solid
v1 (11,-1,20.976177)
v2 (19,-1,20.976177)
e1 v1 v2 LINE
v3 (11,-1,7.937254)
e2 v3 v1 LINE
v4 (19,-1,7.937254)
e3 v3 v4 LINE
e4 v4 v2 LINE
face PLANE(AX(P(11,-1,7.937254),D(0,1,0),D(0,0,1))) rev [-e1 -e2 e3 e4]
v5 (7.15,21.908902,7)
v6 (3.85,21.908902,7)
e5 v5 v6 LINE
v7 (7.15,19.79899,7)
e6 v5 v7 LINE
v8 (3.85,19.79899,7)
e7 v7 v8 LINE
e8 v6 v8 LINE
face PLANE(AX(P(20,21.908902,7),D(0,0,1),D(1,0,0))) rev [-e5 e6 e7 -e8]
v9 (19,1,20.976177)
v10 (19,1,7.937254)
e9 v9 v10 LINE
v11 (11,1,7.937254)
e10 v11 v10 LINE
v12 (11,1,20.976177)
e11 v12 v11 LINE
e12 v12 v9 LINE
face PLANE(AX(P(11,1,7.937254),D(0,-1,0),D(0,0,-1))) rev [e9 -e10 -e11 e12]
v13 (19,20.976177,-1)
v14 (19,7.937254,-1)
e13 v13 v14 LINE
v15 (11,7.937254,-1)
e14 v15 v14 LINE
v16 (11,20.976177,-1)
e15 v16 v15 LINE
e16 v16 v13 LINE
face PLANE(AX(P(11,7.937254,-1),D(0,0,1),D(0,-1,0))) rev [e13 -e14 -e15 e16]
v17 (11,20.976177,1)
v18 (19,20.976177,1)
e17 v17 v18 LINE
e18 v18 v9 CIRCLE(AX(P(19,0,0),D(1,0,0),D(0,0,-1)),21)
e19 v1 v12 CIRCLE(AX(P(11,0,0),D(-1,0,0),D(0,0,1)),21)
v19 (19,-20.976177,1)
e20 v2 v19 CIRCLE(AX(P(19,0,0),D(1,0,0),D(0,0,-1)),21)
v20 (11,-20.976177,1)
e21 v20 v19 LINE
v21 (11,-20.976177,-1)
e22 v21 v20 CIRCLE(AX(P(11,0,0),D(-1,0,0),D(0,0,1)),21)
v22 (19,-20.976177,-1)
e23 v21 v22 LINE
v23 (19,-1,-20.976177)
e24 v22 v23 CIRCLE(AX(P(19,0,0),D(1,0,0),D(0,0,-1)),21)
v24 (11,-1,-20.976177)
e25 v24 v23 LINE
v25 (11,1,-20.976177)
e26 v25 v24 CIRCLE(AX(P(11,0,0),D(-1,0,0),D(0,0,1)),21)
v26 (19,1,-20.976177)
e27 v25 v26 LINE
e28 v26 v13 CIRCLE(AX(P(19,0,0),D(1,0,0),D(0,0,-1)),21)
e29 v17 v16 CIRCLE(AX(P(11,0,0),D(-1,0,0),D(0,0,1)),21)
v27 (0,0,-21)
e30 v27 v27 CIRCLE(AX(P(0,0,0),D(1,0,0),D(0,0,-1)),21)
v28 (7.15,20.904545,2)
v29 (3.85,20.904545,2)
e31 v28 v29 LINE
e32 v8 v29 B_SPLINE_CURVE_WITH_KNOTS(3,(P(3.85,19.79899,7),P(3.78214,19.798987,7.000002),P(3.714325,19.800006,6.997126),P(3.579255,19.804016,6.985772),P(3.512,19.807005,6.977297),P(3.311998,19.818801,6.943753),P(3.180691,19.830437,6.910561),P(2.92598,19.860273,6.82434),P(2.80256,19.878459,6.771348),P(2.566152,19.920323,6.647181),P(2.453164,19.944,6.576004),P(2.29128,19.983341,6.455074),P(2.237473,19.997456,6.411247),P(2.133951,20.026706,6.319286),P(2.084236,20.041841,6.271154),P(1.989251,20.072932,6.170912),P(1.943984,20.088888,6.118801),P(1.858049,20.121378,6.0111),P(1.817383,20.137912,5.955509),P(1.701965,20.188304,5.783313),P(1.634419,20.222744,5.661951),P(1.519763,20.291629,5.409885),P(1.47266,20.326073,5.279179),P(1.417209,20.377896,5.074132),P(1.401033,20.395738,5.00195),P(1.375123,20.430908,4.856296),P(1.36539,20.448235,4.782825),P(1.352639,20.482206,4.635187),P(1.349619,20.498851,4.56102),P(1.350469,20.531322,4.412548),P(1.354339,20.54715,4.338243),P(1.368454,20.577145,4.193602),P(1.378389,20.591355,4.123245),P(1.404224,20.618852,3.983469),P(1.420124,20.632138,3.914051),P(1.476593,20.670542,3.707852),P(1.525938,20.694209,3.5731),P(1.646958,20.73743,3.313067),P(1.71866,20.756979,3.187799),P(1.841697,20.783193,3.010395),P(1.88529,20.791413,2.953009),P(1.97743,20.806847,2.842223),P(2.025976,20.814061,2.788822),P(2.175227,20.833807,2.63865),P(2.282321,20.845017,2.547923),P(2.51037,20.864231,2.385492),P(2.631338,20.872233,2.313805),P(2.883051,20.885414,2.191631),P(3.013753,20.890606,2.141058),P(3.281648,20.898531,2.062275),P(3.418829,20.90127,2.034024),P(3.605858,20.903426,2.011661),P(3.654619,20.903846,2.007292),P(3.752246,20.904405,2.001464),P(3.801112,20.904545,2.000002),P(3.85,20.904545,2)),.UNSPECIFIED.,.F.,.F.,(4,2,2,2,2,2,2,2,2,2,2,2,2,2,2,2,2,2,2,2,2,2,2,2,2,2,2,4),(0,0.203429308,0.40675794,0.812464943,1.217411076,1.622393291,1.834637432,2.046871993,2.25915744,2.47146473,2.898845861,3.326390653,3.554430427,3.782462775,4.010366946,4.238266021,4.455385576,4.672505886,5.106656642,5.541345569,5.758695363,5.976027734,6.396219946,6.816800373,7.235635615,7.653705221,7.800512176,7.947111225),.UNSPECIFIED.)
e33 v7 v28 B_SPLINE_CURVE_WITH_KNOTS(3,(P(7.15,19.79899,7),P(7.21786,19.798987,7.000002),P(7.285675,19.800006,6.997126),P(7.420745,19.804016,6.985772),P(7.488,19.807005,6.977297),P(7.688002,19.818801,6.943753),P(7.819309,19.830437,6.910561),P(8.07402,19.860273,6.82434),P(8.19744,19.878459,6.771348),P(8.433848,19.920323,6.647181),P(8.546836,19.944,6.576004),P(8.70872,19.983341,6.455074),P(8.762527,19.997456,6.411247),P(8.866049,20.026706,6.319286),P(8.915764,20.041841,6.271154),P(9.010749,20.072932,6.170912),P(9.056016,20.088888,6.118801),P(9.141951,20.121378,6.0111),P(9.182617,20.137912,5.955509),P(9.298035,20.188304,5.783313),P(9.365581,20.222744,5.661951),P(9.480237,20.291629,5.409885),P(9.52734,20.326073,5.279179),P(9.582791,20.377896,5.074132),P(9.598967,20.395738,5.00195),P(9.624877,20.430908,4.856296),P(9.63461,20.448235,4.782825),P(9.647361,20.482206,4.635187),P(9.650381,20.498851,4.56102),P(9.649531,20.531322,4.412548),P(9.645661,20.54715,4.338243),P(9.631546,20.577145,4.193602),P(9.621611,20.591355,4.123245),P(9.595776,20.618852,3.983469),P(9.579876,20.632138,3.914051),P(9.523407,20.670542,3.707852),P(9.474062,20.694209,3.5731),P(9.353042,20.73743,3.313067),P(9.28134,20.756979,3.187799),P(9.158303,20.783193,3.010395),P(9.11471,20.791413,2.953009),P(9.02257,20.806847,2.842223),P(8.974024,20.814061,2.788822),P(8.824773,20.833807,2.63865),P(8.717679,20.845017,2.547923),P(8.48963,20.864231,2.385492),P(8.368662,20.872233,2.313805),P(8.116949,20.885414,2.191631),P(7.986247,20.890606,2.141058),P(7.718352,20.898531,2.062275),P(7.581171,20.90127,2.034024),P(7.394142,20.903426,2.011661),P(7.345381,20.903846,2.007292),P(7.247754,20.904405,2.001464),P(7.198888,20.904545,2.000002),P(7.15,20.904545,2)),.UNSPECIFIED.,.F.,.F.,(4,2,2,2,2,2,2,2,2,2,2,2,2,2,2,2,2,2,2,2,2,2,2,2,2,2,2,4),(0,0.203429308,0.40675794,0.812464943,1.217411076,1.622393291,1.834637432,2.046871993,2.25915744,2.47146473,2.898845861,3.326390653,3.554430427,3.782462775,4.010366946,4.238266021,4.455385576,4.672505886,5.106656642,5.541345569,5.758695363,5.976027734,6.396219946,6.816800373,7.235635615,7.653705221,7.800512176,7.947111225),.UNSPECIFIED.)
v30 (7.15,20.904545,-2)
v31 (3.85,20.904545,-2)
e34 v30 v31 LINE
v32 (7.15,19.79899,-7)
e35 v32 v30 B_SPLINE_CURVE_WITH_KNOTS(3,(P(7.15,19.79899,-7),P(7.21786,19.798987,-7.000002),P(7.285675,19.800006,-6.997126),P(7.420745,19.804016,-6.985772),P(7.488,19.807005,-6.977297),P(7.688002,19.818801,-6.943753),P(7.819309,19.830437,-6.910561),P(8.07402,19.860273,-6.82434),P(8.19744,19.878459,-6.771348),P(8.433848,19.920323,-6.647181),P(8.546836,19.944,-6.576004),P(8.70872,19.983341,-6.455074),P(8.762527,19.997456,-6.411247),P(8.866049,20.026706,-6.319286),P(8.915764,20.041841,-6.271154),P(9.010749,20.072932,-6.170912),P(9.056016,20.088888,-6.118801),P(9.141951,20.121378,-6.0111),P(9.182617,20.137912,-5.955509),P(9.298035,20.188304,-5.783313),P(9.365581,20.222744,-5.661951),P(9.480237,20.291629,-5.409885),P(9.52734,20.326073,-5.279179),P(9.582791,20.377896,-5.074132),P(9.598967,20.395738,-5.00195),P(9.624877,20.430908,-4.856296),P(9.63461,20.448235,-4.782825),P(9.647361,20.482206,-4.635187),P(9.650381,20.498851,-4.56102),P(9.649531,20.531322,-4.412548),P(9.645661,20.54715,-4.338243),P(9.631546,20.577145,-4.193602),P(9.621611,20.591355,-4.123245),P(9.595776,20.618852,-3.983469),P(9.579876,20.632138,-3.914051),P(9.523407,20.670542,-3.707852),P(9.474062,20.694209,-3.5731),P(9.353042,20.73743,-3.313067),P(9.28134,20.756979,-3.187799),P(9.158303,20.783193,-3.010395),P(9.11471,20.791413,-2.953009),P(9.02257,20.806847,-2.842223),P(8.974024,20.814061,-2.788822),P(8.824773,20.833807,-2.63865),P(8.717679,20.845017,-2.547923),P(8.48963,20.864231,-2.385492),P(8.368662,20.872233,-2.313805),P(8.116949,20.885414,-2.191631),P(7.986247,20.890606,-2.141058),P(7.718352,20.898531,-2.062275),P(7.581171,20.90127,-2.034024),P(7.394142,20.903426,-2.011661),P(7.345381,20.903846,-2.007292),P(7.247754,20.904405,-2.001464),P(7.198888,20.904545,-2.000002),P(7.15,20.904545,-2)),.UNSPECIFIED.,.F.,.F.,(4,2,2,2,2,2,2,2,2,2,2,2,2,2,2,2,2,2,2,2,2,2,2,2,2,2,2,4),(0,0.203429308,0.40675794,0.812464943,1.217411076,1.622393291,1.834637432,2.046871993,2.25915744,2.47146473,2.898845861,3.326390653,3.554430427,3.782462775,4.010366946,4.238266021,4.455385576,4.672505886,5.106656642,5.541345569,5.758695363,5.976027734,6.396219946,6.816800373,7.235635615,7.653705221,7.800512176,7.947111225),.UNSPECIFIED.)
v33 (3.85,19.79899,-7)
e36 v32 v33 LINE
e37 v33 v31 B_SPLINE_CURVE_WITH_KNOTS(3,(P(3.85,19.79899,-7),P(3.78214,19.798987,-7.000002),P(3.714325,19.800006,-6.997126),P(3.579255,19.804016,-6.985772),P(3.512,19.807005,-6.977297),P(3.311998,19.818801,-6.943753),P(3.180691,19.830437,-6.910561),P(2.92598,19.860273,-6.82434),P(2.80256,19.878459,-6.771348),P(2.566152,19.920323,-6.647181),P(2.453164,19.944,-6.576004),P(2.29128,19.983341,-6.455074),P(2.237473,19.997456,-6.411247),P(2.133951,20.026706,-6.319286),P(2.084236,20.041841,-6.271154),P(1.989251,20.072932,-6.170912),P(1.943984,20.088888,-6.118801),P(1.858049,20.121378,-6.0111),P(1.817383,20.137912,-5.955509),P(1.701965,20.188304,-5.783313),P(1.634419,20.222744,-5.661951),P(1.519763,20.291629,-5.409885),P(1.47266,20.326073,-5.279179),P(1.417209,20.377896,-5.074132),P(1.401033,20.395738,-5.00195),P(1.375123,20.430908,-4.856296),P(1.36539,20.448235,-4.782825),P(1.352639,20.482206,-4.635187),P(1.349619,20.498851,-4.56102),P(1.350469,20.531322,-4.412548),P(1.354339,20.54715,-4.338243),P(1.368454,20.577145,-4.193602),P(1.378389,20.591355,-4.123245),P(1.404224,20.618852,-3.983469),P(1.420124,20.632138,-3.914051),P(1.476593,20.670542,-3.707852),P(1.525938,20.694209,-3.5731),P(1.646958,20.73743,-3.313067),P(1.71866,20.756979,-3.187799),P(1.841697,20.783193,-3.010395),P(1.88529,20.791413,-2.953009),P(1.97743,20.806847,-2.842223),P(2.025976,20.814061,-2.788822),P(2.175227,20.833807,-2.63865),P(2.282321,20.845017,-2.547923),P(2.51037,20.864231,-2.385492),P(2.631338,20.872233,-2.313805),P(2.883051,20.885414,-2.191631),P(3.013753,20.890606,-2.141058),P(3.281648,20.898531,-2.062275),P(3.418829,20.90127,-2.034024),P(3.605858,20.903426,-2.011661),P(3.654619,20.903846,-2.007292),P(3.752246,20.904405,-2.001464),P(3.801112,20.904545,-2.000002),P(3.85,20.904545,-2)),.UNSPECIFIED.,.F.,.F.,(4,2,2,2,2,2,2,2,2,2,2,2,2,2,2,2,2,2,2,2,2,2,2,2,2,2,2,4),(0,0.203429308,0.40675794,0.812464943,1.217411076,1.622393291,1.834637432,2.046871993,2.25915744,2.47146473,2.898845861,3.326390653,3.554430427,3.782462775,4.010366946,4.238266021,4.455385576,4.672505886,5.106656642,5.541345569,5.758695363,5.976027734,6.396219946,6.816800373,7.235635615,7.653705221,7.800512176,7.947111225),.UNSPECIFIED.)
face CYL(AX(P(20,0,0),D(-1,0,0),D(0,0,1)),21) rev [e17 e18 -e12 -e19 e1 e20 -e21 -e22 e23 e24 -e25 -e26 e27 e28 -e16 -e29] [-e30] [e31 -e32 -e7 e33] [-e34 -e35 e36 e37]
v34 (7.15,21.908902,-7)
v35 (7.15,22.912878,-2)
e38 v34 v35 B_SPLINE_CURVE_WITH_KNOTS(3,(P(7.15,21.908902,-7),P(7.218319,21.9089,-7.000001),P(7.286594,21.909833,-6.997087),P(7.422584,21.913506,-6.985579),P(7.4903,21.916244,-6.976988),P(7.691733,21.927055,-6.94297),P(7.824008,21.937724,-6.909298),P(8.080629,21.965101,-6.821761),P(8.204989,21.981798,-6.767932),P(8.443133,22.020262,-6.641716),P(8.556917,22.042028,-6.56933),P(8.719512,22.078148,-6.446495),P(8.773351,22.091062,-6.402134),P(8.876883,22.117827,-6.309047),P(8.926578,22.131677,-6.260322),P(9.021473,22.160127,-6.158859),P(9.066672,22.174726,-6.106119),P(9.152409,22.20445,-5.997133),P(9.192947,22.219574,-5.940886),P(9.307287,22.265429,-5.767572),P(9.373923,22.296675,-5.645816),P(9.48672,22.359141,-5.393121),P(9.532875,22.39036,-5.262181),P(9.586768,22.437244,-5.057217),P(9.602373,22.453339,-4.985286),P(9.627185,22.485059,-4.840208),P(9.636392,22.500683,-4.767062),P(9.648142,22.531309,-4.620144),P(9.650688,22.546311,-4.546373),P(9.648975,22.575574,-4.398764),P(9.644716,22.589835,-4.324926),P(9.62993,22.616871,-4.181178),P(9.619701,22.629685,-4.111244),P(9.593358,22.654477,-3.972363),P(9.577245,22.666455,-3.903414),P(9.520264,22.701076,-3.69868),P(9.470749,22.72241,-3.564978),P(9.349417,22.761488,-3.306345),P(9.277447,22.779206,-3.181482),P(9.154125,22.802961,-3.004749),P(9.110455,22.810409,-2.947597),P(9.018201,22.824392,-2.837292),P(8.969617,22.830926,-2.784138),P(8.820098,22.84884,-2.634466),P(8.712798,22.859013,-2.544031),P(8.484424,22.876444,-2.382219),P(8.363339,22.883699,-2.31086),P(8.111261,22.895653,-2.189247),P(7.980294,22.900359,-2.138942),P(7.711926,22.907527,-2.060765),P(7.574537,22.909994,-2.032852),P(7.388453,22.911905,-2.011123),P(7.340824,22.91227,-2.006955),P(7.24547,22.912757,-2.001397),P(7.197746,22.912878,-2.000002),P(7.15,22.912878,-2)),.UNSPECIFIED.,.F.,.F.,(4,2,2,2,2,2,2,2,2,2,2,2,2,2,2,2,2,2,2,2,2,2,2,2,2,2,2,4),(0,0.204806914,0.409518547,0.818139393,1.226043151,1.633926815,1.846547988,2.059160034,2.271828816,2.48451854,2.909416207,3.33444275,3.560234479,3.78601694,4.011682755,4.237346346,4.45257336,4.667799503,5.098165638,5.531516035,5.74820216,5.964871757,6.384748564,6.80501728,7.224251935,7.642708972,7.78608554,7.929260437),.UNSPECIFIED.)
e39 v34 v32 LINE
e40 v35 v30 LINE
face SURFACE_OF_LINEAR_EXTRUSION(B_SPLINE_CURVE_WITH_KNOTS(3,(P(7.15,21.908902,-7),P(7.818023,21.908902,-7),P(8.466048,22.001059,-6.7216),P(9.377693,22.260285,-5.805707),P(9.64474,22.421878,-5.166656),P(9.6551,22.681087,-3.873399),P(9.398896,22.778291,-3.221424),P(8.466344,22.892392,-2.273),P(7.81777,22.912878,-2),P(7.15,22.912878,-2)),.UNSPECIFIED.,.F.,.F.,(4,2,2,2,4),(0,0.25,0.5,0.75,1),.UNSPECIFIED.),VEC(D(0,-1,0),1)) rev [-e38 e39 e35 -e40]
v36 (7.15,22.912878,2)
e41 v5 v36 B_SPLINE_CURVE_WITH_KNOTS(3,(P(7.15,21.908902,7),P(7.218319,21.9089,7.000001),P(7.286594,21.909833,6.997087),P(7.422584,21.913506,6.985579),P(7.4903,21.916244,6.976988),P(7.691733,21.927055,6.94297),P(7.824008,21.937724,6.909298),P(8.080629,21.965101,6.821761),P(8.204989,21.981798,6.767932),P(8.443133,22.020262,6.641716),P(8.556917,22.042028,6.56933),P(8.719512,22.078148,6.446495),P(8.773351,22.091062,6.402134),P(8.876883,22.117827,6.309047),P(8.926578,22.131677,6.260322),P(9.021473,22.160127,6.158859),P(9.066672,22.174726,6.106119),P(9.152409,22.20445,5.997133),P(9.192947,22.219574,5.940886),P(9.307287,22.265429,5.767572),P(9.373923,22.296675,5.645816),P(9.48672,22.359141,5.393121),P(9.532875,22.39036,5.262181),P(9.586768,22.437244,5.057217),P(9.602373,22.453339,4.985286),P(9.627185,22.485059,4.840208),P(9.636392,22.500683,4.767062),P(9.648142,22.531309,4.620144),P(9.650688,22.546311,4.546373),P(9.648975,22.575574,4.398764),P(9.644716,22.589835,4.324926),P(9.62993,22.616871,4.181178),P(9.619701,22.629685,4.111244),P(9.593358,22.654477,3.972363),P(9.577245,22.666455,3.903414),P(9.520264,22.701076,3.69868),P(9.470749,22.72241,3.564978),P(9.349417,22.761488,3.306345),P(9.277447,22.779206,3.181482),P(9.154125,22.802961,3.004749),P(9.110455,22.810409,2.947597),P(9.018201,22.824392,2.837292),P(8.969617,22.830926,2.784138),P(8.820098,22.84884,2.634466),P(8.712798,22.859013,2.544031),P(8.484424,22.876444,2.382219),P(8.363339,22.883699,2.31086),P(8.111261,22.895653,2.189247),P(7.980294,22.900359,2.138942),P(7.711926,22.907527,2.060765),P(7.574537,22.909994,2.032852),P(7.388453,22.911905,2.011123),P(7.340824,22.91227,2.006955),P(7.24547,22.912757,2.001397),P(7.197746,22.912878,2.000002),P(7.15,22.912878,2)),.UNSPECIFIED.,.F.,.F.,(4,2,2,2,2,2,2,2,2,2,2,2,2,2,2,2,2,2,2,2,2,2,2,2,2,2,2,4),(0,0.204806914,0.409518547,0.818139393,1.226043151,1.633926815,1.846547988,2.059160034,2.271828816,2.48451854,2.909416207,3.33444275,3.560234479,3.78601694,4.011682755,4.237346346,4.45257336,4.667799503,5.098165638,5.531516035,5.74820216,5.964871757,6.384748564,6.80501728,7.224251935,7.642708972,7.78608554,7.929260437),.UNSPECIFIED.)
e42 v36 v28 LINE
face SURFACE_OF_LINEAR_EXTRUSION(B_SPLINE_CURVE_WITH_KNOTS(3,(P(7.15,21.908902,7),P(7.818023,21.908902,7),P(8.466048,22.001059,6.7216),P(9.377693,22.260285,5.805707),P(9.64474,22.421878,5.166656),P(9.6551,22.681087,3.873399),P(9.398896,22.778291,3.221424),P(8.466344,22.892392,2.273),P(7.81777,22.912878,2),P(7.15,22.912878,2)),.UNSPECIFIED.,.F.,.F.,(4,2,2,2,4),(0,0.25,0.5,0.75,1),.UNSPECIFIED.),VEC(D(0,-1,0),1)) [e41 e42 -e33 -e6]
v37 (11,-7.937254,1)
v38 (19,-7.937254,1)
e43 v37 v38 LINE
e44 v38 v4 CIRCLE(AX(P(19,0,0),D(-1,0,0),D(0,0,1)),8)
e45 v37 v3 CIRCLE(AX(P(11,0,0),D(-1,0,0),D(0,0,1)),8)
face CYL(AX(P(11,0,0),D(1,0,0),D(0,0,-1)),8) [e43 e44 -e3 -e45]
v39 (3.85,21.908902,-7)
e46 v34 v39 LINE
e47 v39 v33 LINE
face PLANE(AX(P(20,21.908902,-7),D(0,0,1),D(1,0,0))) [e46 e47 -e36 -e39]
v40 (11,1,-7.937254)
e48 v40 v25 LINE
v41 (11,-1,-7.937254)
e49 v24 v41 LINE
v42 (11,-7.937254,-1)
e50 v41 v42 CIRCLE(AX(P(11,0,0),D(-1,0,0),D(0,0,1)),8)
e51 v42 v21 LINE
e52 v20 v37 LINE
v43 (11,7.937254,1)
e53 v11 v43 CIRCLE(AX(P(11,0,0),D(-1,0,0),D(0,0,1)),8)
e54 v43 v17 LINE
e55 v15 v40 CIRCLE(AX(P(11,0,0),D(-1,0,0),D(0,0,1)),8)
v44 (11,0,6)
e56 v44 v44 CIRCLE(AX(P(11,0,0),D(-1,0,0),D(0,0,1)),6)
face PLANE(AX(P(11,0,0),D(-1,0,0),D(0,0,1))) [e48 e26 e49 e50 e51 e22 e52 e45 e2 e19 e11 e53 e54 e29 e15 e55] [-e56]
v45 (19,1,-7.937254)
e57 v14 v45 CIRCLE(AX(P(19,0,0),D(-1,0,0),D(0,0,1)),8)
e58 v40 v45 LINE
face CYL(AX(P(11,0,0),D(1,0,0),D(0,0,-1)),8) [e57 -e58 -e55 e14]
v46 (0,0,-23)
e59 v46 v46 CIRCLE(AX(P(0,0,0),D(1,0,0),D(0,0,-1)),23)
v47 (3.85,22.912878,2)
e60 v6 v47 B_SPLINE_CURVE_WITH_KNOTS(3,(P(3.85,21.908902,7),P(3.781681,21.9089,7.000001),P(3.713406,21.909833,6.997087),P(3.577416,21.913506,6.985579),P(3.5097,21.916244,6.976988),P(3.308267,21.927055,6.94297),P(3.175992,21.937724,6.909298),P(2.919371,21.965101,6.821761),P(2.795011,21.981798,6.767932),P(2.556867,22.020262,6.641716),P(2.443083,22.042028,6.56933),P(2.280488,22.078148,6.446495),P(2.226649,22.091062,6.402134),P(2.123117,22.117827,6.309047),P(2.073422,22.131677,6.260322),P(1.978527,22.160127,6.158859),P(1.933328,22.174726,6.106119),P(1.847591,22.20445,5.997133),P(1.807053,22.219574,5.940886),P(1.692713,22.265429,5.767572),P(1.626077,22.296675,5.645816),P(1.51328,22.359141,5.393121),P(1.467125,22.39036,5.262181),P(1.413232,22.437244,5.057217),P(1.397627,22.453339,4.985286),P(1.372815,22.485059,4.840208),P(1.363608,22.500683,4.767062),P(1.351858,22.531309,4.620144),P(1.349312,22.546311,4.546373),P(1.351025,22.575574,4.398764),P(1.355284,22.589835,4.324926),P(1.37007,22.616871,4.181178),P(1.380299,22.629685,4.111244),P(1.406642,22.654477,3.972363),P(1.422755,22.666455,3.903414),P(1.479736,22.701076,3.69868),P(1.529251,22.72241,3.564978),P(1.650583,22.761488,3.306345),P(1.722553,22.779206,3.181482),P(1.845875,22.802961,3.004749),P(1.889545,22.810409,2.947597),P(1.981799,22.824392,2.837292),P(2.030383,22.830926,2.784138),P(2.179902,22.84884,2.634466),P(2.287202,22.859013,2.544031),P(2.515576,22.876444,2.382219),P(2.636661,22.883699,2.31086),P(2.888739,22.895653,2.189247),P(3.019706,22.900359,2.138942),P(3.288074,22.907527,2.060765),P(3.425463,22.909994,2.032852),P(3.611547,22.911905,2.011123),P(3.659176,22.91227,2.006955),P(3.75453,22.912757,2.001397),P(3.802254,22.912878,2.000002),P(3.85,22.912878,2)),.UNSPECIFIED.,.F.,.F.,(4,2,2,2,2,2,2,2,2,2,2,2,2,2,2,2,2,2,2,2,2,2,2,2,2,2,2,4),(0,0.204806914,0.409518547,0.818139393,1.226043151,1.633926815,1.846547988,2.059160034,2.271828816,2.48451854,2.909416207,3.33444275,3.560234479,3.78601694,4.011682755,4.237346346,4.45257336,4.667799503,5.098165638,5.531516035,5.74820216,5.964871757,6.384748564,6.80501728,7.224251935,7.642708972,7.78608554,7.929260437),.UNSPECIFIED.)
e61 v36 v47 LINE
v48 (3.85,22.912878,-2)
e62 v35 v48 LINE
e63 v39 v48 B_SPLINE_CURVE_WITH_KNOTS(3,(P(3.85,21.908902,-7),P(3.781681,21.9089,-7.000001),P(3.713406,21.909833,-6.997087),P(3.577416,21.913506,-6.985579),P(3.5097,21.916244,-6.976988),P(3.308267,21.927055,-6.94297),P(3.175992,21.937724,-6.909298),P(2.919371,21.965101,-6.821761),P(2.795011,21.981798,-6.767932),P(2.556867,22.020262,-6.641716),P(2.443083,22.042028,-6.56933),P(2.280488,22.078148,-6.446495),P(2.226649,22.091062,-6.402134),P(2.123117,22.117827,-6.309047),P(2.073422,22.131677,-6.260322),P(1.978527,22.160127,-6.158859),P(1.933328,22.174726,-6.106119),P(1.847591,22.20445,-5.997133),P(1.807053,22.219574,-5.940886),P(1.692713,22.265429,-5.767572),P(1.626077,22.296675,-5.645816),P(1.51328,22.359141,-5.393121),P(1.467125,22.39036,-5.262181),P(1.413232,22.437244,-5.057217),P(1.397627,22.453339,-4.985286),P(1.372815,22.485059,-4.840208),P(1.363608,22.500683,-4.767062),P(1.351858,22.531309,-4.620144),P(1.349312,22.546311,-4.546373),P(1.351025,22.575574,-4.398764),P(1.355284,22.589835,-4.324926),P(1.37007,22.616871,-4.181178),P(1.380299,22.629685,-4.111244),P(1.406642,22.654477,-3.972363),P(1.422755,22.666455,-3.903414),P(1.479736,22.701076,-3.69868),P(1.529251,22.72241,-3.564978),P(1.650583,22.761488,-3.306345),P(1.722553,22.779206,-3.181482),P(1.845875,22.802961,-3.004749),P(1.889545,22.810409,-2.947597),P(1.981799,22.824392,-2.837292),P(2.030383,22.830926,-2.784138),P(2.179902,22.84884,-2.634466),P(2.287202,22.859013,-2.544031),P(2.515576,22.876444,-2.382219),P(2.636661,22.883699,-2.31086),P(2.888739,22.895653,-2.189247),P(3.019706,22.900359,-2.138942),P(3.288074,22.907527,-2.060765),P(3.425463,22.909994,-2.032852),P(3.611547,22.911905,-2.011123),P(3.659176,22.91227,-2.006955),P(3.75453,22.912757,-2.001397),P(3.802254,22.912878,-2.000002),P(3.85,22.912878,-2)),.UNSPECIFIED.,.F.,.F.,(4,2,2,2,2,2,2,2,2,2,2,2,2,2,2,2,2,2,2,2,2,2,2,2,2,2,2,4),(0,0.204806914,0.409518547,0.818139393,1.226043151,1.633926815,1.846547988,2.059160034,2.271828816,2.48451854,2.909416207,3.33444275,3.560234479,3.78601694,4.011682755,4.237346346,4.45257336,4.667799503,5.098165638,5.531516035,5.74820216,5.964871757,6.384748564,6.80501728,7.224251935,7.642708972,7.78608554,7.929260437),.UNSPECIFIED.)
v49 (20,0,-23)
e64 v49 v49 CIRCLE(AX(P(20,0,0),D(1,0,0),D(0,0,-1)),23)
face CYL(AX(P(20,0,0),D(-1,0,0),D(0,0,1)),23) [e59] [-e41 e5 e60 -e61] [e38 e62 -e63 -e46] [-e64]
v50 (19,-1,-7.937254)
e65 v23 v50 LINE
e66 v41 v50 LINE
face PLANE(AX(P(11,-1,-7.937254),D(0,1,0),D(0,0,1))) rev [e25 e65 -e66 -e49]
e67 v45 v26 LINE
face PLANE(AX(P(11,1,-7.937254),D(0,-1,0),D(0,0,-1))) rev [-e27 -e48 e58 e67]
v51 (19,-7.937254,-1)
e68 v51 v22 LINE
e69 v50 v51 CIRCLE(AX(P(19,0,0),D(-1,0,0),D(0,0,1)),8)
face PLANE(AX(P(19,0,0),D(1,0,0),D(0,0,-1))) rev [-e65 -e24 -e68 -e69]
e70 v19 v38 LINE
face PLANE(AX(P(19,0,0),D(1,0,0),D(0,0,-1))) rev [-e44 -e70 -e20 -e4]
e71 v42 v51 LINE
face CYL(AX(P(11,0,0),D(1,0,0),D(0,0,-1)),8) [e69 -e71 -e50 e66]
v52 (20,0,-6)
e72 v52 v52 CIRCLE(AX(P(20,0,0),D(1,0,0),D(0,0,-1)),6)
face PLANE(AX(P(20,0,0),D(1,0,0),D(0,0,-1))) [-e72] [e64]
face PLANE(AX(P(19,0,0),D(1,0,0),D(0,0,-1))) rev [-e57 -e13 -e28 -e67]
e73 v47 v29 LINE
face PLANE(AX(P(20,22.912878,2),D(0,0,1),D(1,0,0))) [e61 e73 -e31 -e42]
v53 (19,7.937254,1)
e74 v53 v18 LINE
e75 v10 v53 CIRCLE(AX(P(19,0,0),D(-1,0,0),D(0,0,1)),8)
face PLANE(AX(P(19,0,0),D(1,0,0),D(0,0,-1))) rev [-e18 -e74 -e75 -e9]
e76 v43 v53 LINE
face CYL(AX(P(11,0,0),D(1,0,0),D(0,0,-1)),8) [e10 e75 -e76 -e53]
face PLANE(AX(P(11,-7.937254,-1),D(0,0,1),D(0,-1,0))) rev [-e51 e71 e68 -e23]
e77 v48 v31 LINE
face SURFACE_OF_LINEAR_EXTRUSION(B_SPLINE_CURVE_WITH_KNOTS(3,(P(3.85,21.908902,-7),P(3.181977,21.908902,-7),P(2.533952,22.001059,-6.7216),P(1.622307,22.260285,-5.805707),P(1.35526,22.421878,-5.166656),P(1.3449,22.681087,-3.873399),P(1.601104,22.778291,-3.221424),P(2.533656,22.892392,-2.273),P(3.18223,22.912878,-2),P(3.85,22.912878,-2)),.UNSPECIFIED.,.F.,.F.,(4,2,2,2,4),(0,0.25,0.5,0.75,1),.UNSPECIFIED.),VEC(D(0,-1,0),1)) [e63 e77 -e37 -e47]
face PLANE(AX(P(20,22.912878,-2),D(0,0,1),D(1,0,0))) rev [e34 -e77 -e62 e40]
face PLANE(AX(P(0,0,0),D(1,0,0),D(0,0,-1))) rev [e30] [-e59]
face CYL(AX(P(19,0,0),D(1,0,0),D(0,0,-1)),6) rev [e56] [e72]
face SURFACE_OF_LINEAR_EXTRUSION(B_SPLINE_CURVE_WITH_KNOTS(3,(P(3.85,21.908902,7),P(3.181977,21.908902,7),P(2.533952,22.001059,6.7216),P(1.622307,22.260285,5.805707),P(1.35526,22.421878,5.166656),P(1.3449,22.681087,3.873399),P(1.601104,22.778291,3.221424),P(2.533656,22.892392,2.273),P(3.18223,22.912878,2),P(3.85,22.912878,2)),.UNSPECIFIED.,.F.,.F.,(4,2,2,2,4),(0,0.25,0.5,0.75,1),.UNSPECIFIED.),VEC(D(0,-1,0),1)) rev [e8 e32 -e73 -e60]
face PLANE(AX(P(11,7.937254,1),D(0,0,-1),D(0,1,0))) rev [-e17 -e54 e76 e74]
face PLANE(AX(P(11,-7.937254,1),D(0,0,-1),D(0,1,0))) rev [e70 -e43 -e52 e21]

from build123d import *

# Parameters (mm, degrees)
SKETCH1_R           = 23
SKETCH1_R_2         = 21
BOSS_EXTRUDE1_DEPTH = 20
CUT_EXTRUDE1_START  = 19.798989767
CUT_EXTRUDE1_DEPTH  = 3.113888708
BOSS_EXTRUDE2_START = -1
SKETCH3_R           = 21
SKETCH3_R_2         = 6
BOSS_EXTRUDE2_DEPTH = 1
BOSS_EXTRUDE3_START = 8
SKETCH4_R           = 6
BOSS_EXTRUDE3_DEPTH = 8


# Read off the part's stored shape, not the designer's step: Cut-Extrude1
with BuildPart() as part:
    # Sketch1 → Boss-Extrude1 (new body)
    with BuildSketch(Plane(origin=(0, 0, 0), x_dir=(0, 0, -1), z_dir=(1, 0, 0))):
        Circle(SKETCH1_R)
        Circle(SKETCH1_R_2, mode=Mode.SUBTRACT)
    extrude(amount=BOSS_EXTRUDE1_DEPTH)

    # Cut-Extrude1 outline → Cut-Extrude1 (cut)
    with BuildSketch(Plane(origin=(0, 0, 0), x_dir=(1, 0, 0), z_dir=(0, 1, 0)).offset(CUT_EXTRUDE1_START)):
        with BuildLine():
            add(Edge.make_bspline(
                [(7.15, 7), (7.818022917, 7), (8.466048034, 6.72160004), (9.377693338, 5.805707302), (9.644739555, 5.166655745), (9.655100007, 3.873398622), (9.398895769, 3.221423625), (8.466344312, 2.273000364), (7.817770221, 2), (7.15, 2)],
                knots=[0, 0, 0, 0, 0.25, 0.25, 0.5, 0.5, 0.75, 0.75, 1, 1, 1, 1], degree=3))
            Line((7.15, 7), (3.85, 7))
            add(Edge.make_bspline(
                [(3.85, 7), (3.181977083, 7), (2.533951966, 6.72160004), (1.622306662, 5.805707302), (1.355260445, 5.166655745), (1.344899993, 3.873398622), (1.601104231, 3.221423625), (2.533655688, 2.273000364), (3.182229779, 2), (3.85, 2)],
                knots=[0, 0, 0, 0, 0.25, 0.25, 0.5, 0.5, 0.75, 0.75, 1, 1, 1, 1], degree=3))
            Line((3.85, 2), (7.15, 2))
        make_face()
        with BuildLine():
            Line((3.85, -7), (7.15, -7))
            add(Edge.make_bspline(
                [(7.15, -7), (7.818022917, -7), (8.466048034, -6.72160004), (9.377693338, -5.805707302), (9.644739555, -5.166655745), (9.655100007, -3.873398622), (9.398895769, -3.221423625), (8.466344312, -2.273000364), (7.817770221, -2), (7.15, -2)],
                knots=[0, 0, 0, 0, 0.25, 0.25, 0.5, 0.5, 0.75, 0.75, 1, 1, 1, 1], degree=3))
            Line((7.15, -2), (3.85, -2))
            add(Edge.make_bspline(
                [(3.85, -7), (3.181977083, -7), (2.533951966, -6.72160004), (1.622306662, -5.805707302), (1.355260445, -5.166655745), (1.344899993, -3.873398622), (1.601104231, -3.221423625), (2.533655688, -2.273000364), (3.182229779, -2), (3.85, -2)],
                knots=[0, 0, 0, 0, 0.25, 0.25, 0.5, 0.5, 0.75, 0.75, 1, 1, 1, 1], degree=3))
        make_face()
    extrude(amount=CUT_EXTRUDE1_DEPTH, mode=Mode.SUBTRACT)

    # Sketch3 → Boss-Extrude2 (add)
    with BuildSketch(Plane(origin=(20, 0, 0), x_dir=(0, 0, -1), z_dir=(1, 0, 0)).offset(BOSS_EXTRUDE2_START)):
        Circle(SKETCH3_R)
        Circle(SKETCH3_R_2, mode=Mode.SUBTRACT)
    extrude(amount=BOSS_EXTRUDE2_DEPTH)

    # Sketch4 → Boss-Extrude3 (add)
    with BuildSketch(Plane.ZY.offset(-19).offset(BOSS_EXTRUDE3_START)):
        with BuildLine():
            Line((7.937253933, -1), (20.976176963, -1))
            ThreePointArc((20.976176963, -1), (21, 0), (20.976176963, 1))
            Line((20.976176963, 1), (7.937253933, 1))
            ThreePointArc((7.937253933, 1), (5.656854249, 5.656854249), (1, 7.937253933))
            Line((1, 7.937253933), (1, 20.976176963))
            ThreePointArc((1, 20.976176963), (0, 21), (-1, 20.976176963))
            Line((-1, 20.976176963), (-1, 7.937253933))
            ThreePointArc((-1, 7.937253933), (-5.656854249, 5.656854249), (-7.937253933, 1))
            Line((-7.937253933, 1), (-20.976176963, 1))
            ThreePointArc((-20.976176963, 1), (-21, 0), (-20.976176963, -1))
            Line((-20.976176963, -1), (-7.937253933, -1))
            ThreePointArc((-7.937253933, -1), (-5.656854249, -5.656854249), (-1, -7.937253933))
            Line((-1, -7.937253933), (-1, -20.976176963))
            ThreePointArc((-1, -20.976176963), (0, -21), (1, -20.976176963))
            Line((1, -20.976176963), (1, -7.937253933))
            ThreePointArc((1, -7.937253933), (5.656854249, -5.656854249), (7.937253933, -1))
        make_face()
        with Locations(Location((0, 0, 0), (0, 0, 180))):
            Circle(SKETCH4_R, mode=Mode.SUBTRACT)
    extrude(amount=-BOSS_EXTRUDE3_DEPTH)


solid = part.part
